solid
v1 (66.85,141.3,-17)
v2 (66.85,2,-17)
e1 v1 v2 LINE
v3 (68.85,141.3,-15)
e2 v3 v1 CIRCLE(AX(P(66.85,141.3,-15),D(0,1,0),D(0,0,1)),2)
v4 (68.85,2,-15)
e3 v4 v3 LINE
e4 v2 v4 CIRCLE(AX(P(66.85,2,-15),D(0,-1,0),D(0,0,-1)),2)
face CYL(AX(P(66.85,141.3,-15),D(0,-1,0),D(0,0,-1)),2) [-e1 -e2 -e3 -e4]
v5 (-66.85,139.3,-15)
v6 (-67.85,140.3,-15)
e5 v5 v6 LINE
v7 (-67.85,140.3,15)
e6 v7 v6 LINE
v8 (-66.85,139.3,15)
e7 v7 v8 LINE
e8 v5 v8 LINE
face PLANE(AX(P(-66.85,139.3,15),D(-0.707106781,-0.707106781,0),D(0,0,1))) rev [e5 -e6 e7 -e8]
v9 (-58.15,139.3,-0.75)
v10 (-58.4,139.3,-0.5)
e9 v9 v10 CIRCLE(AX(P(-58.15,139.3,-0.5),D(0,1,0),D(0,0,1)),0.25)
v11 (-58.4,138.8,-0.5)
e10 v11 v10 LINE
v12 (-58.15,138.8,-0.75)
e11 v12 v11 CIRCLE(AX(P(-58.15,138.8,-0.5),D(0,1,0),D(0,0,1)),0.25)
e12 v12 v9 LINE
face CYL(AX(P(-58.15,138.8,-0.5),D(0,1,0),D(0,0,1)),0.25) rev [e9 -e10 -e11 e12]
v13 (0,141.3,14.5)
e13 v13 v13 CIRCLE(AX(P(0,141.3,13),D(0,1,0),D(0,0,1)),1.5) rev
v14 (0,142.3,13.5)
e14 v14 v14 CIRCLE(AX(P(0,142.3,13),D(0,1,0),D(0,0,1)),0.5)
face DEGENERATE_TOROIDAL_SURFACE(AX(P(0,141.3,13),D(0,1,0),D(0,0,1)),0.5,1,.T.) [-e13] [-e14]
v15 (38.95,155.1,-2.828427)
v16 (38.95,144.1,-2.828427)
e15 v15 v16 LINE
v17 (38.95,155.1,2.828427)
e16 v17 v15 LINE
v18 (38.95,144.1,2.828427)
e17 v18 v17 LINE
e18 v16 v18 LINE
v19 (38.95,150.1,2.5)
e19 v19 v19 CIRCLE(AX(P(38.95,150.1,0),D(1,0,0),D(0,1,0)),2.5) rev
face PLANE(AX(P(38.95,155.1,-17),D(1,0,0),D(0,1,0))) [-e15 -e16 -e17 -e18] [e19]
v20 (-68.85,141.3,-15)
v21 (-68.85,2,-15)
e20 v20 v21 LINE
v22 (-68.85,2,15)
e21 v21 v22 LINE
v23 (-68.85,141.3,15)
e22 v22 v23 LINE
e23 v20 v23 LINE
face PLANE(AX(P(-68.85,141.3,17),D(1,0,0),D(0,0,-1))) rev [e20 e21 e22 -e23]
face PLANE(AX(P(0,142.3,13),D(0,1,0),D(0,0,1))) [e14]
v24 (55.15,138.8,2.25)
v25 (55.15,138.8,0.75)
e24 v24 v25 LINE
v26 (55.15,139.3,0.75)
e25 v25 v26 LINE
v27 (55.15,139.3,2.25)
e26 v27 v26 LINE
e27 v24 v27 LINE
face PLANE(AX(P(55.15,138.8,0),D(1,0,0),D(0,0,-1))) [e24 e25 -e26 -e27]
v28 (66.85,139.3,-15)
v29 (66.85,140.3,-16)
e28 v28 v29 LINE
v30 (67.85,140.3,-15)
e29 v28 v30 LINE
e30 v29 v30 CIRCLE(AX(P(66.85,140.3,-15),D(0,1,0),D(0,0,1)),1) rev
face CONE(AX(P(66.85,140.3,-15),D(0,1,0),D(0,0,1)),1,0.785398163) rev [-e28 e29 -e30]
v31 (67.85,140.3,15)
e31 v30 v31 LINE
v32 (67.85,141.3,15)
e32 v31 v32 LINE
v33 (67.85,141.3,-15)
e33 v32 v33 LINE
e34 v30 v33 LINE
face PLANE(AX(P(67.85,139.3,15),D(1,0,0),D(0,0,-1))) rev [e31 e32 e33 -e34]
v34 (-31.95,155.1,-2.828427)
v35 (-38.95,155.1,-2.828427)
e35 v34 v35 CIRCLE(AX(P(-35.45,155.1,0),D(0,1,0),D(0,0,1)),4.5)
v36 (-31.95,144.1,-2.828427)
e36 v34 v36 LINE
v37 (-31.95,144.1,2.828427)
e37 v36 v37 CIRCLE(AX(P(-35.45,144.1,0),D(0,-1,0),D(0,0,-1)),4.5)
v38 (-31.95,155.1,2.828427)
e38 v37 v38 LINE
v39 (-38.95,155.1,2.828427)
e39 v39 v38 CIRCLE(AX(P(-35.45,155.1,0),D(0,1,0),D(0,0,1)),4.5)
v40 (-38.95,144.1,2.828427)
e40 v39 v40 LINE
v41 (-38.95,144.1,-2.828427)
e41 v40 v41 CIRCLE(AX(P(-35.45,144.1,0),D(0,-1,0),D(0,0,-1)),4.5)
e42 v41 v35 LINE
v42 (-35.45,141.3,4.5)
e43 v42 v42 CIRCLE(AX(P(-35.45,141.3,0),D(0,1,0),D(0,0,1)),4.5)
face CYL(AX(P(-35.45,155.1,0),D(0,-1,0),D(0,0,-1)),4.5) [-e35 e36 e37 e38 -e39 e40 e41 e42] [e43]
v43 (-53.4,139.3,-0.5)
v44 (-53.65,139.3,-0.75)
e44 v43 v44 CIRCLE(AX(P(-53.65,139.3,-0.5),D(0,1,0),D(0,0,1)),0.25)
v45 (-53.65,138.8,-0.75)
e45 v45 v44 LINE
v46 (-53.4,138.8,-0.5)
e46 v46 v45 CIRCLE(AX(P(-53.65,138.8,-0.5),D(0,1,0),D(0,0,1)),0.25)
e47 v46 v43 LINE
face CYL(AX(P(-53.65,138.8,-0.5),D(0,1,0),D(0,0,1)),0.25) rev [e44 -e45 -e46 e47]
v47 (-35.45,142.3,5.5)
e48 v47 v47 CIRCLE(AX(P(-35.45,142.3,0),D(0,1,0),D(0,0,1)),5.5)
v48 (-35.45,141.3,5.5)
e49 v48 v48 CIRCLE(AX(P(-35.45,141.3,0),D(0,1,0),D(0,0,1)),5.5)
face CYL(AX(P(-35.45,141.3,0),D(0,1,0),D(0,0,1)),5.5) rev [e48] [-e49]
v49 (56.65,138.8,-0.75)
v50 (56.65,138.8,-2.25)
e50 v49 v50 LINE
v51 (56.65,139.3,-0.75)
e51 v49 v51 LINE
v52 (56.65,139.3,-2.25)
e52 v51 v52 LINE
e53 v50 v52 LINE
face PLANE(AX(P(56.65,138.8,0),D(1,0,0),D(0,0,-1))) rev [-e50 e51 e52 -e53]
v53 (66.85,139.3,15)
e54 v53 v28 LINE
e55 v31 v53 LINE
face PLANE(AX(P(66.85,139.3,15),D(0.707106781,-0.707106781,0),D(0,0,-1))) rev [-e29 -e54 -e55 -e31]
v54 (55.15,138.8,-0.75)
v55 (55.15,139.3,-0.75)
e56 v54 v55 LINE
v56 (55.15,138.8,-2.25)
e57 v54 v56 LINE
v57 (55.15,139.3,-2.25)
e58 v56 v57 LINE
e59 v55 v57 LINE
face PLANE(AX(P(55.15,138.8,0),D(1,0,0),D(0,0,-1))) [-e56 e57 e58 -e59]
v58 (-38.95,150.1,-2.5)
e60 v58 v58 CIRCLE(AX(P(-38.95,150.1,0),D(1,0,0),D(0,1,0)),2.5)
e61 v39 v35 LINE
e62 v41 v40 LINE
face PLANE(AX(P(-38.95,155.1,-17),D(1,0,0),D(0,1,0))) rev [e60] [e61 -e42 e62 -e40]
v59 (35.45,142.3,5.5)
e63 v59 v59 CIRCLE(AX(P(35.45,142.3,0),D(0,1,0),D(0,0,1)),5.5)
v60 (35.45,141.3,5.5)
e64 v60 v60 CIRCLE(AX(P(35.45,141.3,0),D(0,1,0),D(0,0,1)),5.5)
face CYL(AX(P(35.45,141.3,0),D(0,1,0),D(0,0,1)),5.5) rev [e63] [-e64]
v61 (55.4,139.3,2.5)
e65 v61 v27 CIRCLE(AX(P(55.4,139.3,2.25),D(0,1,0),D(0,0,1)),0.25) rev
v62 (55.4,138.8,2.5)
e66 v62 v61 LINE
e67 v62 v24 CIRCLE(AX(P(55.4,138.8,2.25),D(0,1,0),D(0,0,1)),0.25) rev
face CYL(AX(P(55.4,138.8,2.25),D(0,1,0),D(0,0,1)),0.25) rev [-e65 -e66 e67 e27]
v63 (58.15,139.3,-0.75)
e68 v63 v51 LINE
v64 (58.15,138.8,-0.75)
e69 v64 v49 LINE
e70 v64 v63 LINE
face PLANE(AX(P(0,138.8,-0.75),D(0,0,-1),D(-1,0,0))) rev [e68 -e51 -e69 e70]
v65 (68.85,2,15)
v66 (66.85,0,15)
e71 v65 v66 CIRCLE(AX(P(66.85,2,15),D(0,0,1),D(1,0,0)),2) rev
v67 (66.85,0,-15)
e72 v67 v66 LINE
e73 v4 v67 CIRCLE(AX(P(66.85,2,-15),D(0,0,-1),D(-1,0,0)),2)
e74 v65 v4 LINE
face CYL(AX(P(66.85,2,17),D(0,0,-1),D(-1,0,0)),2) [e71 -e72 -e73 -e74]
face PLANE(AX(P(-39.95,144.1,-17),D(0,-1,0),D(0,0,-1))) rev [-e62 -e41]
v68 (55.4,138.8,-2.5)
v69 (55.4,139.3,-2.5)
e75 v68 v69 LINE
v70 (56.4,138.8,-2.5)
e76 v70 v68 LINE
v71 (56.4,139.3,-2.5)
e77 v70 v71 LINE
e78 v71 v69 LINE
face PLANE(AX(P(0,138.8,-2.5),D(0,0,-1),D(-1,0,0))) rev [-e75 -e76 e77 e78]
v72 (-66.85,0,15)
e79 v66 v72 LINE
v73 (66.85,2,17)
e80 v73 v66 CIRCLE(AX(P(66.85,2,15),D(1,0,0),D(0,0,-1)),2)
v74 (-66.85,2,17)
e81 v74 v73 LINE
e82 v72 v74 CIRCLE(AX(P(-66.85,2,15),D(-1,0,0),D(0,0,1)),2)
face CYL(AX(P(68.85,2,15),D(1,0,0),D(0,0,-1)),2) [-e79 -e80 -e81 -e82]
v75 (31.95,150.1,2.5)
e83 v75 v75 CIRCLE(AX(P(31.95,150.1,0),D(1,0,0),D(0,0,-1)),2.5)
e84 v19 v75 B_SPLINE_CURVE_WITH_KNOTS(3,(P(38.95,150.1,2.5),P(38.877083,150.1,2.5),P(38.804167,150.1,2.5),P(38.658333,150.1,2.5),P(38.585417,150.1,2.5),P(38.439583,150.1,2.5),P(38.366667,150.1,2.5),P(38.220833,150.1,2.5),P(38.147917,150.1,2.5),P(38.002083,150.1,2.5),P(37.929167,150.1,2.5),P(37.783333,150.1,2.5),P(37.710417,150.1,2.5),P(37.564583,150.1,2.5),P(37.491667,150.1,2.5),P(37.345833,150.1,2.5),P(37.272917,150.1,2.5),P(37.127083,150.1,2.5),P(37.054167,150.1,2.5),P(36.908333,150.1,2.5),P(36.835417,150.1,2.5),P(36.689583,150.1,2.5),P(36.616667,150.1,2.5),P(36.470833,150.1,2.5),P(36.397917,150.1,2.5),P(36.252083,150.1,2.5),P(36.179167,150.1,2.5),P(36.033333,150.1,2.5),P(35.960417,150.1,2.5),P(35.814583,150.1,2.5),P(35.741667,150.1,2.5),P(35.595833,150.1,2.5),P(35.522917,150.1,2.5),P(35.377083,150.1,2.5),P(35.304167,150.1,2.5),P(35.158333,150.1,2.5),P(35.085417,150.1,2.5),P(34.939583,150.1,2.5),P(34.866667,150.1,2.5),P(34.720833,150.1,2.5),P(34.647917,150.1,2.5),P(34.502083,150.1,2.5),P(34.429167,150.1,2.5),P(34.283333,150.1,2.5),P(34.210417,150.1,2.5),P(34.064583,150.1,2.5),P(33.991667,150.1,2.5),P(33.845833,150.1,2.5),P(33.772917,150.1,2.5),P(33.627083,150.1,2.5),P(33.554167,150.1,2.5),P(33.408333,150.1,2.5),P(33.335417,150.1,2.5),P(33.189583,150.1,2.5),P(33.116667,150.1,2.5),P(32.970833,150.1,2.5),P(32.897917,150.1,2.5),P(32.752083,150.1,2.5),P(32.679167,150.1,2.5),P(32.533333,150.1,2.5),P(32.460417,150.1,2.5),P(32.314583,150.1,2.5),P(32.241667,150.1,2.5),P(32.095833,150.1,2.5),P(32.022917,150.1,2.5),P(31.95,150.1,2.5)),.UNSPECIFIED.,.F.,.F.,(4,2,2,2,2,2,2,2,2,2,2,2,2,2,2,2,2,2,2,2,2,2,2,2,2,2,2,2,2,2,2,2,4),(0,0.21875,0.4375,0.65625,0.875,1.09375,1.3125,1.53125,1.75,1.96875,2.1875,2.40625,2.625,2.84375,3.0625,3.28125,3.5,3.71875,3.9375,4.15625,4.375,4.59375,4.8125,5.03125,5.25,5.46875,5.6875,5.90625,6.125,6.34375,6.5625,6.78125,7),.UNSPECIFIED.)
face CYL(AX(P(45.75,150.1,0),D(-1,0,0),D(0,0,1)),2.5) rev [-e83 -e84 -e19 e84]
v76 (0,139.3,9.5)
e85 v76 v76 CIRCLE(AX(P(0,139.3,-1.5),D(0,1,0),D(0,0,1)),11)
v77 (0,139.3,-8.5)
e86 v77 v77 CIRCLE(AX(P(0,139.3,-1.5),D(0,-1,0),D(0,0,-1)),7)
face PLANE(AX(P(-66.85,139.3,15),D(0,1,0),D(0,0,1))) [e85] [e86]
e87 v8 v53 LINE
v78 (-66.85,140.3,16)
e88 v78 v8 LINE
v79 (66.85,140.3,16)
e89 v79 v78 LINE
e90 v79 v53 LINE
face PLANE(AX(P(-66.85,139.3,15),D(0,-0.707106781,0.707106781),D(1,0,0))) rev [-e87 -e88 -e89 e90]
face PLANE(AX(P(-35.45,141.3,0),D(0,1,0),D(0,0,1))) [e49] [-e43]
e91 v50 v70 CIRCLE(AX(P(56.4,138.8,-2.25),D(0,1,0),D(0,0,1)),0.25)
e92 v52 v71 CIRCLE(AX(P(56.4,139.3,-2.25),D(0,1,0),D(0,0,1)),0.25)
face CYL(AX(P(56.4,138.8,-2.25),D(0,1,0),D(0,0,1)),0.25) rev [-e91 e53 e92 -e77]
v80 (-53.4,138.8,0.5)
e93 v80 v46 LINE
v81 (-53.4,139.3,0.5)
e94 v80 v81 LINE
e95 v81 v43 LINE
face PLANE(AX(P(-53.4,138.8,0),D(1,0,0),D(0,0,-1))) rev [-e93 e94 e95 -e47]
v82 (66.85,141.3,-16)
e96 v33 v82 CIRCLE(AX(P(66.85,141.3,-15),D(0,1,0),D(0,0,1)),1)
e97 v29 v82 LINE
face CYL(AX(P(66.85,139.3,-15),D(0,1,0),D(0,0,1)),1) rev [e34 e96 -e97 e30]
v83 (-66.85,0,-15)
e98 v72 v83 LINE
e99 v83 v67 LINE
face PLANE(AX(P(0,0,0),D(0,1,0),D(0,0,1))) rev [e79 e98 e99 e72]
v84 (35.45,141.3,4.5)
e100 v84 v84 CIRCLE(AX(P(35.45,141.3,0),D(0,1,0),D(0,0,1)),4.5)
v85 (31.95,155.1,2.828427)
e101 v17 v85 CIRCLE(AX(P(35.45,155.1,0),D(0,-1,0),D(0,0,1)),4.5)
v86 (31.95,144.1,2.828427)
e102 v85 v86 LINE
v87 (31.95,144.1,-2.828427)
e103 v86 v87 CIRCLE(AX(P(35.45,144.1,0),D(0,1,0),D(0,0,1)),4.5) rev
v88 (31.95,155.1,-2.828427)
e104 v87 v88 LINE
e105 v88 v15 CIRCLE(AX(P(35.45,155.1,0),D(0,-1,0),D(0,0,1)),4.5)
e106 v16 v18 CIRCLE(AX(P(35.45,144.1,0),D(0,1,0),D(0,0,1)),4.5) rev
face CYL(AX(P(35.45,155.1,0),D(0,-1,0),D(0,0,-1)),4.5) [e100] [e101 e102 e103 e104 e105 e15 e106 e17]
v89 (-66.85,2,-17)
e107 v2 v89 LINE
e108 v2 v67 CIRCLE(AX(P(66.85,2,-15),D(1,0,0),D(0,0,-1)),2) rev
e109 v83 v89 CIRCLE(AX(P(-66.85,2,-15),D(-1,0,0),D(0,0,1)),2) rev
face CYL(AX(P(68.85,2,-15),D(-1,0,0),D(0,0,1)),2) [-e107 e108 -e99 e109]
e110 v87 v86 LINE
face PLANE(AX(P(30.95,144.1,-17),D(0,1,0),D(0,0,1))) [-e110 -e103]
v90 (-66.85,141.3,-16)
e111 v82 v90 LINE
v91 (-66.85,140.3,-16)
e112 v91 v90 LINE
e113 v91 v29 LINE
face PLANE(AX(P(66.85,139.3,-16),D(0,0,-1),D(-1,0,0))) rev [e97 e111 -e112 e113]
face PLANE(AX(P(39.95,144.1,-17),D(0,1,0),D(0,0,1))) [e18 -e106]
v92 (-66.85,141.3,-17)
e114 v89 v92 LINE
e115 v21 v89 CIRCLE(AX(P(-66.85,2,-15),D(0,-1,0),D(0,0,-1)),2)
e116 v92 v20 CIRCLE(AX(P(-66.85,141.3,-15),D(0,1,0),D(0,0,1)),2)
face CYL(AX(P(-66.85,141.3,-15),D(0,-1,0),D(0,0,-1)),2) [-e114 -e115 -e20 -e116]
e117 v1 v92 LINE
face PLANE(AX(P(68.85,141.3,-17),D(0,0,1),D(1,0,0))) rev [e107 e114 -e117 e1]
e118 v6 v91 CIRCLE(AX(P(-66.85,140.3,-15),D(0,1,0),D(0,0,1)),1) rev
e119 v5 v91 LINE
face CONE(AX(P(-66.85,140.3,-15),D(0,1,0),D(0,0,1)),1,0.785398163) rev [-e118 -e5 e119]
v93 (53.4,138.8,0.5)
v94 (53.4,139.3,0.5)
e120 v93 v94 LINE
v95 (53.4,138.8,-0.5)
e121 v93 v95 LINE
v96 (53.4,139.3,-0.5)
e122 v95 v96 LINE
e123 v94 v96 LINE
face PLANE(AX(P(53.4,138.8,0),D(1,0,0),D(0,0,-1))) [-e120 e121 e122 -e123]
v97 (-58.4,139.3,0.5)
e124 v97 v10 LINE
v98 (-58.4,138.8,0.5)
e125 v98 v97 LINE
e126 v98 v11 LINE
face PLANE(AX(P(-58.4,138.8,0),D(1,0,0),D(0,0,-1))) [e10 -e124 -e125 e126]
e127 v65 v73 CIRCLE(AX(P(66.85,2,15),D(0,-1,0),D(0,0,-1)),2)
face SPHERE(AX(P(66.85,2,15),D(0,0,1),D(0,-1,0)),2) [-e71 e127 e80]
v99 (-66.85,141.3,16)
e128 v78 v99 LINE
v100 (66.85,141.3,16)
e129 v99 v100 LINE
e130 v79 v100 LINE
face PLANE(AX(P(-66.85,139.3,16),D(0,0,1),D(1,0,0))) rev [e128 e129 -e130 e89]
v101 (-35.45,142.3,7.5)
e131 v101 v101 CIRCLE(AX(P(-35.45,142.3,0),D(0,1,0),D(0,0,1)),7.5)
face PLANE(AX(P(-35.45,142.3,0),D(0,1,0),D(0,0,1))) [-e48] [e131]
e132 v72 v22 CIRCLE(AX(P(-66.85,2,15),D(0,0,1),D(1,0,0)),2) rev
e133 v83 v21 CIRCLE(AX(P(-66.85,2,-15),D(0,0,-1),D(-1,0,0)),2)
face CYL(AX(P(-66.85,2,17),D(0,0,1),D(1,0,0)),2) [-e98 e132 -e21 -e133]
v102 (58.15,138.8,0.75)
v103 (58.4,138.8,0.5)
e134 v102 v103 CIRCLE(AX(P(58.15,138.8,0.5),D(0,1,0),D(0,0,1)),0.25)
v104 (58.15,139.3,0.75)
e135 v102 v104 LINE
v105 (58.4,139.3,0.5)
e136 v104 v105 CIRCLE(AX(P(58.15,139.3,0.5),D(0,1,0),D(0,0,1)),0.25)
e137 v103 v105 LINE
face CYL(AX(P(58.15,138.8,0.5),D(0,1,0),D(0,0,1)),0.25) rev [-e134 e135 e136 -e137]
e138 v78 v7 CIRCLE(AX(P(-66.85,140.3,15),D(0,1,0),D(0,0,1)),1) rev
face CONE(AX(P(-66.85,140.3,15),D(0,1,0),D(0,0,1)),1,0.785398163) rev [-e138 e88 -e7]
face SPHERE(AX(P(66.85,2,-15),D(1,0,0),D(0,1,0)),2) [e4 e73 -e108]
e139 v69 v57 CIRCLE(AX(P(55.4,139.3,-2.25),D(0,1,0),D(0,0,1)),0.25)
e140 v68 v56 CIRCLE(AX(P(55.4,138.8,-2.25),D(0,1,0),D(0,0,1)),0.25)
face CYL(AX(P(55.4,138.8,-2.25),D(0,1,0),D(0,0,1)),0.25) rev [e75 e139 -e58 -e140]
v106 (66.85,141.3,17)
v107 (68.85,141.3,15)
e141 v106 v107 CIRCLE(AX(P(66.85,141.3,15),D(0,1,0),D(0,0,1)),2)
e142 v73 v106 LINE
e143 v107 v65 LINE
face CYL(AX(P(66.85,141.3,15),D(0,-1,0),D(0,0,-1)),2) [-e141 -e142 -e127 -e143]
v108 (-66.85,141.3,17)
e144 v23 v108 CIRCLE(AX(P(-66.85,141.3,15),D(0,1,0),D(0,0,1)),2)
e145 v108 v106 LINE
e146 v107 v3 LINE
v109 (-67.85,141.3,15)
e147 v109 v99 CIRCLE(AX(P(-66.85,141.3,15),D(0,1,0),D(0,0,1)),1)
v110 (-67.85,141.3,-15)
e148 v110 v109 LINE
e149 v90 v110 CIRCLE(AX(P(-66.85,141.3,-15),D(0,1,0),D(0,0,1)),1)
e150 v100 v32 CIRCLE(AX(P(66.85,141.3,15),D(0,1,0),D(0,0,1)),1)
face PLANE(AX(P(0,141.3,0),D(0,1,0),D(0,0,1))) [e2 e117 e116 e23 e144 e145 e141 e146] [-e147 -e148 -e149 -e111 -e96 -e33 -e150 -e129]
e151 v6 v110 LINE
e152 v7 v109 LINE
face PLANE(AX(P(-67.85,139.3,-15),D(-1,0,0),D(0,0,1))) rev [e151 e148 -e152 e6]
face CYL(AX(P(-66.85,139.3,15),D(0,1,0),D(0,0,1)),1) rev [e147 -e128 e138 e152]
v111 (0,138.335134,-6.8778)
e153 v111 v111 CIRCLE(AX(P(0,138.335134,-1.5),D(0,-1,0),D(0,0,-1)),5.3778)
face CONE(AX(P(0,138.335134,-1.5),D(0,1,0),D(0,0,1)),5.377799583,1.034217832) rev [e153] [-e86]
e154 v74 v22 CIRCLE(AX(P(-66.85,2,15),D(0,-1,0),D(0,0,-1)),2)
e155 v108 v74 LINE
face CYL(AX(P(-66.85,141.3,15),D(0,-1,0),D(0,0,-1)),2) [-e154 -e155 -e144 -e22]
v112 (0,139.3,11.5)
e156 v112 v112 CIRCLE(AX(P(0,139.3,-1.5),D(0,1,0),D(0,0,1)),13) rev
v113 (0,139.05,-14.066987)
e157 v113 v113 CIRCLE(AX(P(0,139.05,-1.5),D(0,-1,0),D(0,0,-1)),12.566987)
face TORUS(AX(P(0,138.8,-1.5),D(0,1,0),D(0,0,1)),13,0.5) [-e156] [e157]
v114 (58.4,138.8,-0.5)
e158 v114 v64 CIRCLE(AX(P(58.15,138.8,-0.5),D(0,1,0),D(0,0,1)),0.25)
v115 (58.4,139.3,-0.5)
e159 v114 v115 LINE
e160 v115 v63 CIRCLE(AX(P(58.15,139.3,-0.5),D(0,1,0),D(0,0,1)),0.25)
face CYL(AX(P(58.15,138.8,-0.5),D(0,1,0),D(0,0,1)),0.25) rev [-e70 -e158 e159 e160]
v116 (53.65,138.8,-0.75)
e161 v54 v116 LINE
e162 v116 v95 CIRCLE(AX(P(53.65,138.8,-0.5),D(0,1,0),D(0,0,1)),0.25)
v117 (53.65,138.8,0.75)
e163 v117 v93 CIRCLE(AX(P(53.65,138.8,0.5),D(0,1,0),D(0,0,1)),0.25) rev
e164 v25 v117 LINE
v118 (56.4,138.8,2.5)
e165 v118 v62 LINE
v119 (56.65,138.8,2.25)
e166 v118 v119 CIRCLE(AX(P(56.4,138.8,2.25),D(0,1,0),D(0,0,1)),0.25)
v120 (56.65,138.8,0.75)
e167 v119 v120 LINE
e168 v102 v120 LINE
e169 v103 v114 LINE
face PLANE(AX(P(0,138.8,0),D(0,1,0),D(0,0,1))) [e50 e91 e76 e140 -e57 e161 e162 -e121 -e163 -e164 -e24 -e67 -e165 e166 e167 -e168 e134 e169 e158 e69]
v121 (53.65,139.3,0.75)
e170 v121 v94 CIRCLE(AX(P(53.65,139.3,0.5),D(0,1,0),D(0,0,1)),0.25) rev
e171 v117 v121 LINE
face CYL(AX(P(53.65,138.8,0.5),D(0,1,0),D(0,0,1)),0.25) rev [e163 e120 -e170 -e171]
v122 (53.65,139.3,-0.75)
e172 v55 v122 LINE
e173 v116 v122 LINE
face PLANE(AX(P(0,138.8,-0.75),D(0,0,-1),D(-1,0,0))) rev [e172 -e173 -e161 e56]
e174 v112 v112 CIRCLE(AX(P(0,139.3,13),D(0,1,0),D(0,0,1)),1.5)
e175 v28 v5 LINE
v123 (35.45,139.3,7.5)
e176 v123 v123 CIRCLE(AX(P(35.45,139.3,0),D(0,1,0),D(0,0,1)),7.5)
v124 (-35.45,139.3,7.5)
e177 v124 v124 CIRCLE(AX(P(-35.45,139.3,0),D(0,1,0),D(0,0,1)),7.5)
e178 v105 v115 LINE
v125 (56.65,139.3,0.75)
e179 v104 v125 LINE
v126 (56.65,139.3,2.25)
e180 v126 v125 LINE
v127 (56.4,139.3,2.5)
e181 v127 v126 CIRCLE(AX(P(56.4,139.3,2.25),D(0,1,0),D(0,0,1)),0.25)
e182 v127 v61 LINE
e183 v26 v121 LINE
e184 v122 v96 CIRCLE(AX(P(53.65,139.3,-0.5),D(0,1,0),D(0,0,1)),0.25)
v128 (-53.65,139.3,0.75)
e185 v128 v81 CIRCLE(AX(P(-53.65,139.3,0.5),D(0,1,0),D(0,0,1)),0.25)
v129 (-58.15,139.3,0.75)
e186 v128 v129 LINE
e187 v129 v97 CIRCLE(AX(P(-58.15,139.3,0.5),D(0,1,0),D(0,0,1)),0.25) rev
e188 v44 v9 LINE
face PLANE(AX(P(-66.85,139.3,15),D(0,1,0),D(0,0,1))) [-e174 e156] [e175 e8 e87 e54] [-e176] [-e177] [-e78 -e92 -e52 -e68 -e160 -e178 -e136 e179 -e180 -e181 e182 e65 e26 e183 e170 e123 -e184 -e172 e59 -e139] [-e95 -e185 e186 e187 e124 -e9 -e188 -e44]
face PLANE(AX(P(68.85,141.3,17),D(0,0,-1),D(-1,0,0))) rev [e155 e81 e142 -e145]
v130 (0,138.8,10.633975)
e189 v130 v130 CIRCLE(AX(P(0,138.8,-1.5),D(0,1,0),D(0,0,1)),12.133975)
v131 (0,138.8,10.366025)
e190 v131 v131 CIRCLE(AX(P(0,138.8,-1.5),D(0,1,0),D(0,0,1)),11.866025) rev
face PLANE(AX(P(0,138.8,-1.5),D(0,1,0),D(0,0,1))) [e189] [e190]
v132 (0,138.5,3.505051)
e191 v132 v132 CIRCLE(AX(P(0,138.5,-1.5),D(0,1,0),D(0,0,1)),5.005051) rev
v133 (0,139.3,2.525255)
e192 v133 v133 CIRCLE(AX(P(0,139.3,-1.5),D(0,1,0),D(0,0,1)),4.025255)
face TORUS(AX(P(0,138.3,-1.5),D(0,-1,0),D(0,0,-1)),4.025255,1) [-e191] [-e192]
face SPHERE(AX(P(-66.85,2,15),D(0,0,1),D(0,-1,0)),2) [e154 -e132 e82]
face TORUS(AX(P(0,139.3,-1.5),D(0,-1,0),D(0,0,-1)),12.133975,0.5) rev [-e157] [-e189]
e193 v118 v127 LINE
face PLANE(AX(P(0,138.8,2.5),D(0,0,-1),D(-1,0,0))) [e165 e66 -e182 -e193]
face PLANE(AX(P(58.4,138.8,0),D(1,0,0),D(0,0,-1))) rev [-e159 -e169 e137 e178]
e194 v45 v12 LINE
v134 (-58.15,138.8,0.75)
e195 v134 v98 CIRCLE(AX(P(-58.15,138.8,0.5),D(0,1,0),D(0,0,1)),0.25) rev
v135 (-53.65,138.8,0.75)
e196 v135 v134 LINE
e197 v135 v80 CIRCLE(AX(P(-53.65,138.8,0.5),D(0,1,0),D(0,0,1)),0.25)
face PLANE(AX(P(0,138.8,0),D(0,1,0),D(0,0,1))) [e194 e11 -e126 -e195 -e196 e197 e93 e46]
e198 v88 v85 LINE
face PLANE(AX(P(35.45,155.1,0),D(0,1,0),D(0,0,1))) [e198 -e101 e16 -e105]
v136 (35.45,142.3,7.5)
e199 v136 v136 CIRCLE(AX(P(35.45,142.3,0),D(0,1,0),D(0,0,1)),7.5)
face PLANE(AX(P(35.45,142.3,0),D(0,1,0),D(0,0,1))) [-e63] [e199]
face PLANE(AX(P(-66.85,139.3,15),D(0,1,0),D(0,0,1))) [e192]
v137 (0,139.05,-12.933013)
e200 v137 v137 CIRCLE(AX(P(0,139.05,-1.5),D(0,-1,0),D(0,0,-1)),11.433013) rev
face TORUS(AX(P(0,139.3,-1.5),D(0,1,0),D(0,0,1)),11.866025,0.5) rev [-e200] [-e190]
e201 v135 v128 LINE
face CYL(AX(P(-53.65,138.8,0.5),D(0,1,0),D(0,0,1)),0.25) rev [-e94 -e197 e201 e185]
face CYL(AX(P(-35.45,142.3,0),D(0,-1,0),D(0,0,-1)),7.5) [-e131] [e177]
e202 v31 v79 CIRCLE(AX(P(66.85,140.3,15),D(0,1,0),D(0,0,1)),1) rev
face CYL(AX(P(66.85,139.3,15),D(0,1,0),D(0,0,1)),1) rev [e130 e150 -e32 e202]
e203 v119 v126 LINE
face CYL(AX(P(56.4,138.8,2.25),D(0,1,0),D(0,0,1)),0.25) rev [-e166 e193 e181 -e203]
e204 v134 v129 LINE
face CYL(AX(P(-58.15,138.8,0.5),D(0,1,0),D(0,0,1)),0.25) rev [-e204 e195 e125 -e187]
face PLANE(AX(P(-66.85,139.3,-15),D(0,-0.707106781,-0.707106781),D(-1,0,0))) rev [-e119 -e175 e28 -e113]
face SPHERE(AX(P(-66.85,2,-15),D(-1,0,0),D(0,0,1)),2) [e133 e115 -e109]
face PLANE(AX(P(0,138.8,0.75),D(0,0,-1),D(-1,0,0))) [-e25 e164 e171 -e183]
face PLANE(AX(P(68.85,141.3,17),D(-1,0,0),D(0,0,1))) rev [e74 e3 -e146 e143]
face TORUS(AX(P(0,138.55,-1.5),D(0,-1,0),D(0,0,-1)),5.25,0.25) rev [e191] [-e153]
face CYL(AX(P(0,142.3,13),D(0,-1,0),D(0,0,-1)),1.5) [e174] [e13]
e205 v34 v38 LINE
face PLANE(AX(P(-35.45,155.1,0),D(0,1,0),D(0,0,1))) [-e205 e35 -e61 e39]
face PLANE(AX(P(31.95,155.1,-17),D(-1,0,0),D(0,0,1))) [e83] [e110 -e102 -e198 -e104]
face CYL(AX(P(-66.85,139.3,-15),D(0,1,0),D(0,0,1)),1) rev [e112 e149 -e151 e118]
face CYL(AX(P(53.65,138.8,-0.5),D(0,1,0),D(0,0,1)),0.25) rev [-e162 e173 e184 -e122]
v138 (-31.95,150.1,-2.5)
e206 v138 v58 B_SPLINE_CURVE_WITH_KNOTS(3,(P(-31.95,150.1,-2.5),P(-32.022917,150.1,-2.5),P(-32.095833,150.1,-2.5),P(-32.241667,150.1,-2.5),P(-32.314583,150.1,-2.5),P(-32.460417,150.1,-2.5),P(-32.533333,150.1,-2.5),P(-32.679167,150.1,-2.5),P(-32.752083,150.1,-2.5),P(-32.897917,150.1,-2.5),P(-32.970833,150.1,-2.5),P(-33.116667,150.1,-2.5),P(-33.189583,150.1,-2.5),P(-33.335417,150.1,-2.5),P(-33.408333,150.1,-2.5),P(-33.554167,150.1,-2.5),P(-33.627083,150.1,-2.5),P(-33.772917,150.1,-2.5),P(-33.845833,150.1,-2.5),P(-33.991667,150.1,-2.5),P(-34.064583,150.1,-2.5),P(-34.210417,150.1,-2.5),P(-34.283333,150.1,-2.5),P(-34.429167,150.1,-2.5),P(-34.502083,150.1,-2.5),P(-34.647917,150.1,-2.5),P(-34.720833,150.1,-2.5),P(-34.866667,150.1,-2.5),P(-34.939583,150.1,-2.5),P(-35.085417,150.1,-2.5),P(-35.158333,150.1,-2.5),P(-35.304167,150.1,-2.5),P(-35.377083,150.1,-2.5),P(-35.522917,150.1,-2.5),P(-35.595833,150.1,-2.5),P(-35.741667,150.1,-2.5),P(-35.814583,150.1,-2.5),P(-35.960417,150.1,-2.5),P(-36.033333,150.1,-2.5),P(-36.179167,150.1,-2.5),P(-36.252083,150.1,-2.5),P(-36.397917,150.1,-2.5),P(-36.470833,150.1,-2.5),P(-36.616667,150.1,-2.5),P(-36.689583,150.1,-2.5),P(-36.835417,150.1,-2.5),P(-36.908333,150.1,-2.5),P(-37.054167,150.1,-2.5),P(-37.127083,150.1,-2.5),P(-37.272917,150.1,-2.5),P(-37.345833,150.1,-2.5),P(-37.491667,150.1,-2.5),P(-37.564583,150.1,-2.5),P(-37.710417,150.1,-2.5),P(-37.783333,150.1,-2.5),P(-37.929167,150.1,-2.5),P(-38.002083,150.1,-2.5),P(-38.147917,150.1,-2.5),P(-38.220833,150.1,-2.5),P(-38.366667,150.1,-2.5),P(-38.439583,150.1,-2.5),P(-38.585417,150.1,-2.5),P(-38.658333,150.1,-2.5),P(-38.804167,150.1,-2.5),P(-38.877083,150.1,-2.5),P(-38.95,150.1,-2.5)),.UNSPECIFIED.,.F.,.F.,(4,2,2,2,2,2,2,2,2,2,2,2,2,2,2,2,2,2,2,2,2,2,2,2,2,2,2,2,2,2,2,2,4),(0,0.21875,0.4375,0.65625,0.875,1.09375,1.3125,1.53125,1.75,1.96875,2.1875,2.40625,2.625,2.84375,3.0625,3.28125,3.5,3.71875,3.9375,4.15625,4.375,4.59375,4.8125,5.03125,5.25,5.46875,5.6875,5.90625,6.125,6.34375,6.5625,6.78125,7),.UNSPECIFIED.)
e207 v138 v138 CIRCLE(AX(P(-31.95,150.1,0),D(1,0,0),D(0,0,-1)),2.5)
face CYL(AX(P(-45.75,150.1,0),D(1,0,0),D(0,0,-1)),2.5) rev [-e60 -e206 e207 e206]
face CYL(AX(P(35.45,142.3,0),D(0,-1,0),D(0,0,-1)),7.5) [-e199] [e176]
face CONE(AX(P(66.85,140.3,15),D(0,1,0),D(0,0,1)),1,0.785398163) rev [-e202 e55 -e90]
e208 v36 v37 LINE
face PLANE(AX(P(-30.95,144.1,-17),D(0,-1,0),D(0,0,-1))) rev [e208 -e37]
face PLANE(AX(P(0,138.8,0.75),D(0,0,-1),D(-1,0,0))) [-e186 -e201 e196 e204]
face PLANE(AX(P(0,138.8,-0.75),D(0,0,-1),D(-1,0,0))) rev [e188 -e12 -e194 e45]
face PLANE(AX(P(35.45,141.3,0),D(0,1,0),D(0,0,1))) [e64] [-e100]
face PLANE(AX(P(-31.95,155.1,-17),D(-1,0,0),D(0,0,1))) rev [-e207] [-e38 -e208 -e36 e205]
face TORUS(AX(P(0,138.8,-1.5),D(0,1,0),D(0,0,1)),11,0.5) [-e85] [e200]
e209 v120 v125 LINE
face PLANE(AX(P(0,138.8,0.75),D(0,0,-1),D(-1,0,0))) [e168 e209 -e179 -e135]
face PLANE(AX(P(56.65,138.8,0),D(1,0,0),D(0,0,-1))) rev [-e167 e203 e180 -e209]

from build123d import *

# Parameters (mm, degrees)
SKETCH1_W           = 137.7
SKETCH1_H           = 34
BOSS_EXTRUDE1_DEPTH = 141.3
FILLET1_R           = 2
CUT_EXTRUDE1_DEPTH  = 2
CHAMFER1_SIZE       = 1
SKETCH3_R           = 7.5
BOSS_EXTRUDE2_DEPTH = 3
SKETCH4_R           = 5.5
CUT_EXTRUDE2_DEPTH  = 1
SKETCH5_R           = 4.5
BOSS_EXTRUDE3_DEPTH = 13.8
SKETCH6_W           = 1
SKETCH6_H           = 11
CUT_EXTRUDE3_DEPTH  = 171.54422447
SKETCH7_R           = 2.5
CUT_EXTRUDE4_DEPTH  = 13.8
SKETCH8_W           = 1.5
SKETCH8_H           = 1.5
CUT_EXTRUDE5_DEPTH  = 0.5
SKETCH9_R           = 12.5
SKETCH9_R_2         = 11.5
CUT_EXTRUDE6_DEPTH  = 0.5
SKETCH10_R          = 1.5
BOSS_EXTRUDE4_DEPTH = 3
FILLET2_R           = 1
SKETCH12_W          = 2
SKETCH12_H          = 0.813567547
FILLET3_R           = 1
FILLET4_R           = 0.5
FILLET5_R           = 0.5


with BuildPart() as part:
    # Sketch1 → Boss-Extrude1 (new body)
    with BuildSketch(Plane(origin=(0, 0, 0), x_dir=(1, 0, 0), z_dir=(0, 1, 0))):
        Rectangle(SKETCH1_W, SKETCH1_H)
    extrude(amount=BOSS_EXTRUDE1_DEPTH)

    # Fillet1
    fillet1_edges = [part.edges().sort_by_distance(p)[0] for p in [
        (0, 0, -17),
        (68.85, 0, 0),
        (0, 0, 17),
        (-68.85, 0, 0),
        (-68.85, 70.65, -17),
        (68.85, 70.65, -17),
        (68.85, 70.65, 17),
        (-68.85, 70.65, 17),
    ]]
    fillet(fillet1_edges, radius=FILLET1_R)

    # Sketch2 → Cut-Extrude1 (cut)
    with BuildSketch(Plane(origin=(0, 141.3, 0), x_dir=(1, 0, 0), z_dir=(0, 1, 0))):
        with BuildLine():
            Line((-66.85, -16), (66.85, -16))
            ThreePointArc((66.85, -16), (67.557106781, -15.707106781), (67.85, -15))
            Line((67.85, -15), (67.85, 15))
            ThreePointArc((67.85, 15), (67.557106781, 15.707106781), (66.85, 16))
            Line((66.85, 16), (-66.85, 16))
            ThreePointArc((-66.85, 16), (-67.557106781, 15.707106781), (-67.85, 15))
            Line((-67.85, 15), (-67.85, -15))
            ThreePointArc((-67.85, -15), (-67.557106781, -15.707106781), (-66.85, -16))
        make_face()
    extrude(amount=-CUT_EXTRUDE1_DEPTH, mode=Mode.SUBTRACT)

    # Chamfer1
    chamfer1_edges = [part.edges().sort_by_distance(p)[0] for p in [
        (-67.557106781, 139.3, 15.707106781),
        (-67.85, 139.3, 0),
        (-67.557106781, 139.3, -15.707106781),
        (0, 139.3, -16),
        (67.557106781, 139.3, -15.707106781),
        (67.85, 139.3, 0),
        (67.557106781, 139.3, 15.707106781),
        (0, 139.3, 16),
    ]]
    chamfer(chamfer1_edges, length=CHAMFER1_SIZE - 0.0001)  # a hair under: the kernel refuses the full size

    # Sketch3 → Boss-Extrude2 (add)
    with BuildSketch(Plane(origin=(0, 139.3, 0), x_dir=(1, 0, 0), z_dir=(0, 1, 0))):
        with Locations(Location((-35.45, 0, 0), (0, 0, 270))):
            Circle(SKETCH3_R)
        with Locations(Location((35.45, 0, 0), (0, 0, 270))):
            Circle(SKETCH3_R)
    extrude(amount=BOSS_EXTRUDE2_DEPTH)

    # Sketch4 → Cut-Extrude2 (cut)
    with BuildSketch(Plane(origin=(0, 142.3, 0), x_dir=(1, 0, 0), z_dir=(0, 1, 0))):
        with Locations(Location((-35.45, 0, 0), (0, 0, 270))):
            Circle(SKETCH4_R)
        with Locations(Location((35.45, 0, 0), (0, 0, 270))):
            Circle(SKETCH4_R)
    extrude(amount=-CUT_EXTRUDE2_DEPTH, mode=Mode.SUBTRACT)

    # Sketch5 → Boss-Extrude3 (add)
    with BuildSketch(Plane(origin=(0, 141.3, 0), x_dir=(1, 0, 0), z_dir=(0, 1, 0))):
        with Locations(Location((-35.45, 0, 0), (0, 0, 90))):
            Circle(SKETCH5_R)
    boss_extrude3 = extrude(amount=BOSS_EXTRUDE3_DEPTH)

    # Sketch6 → Cut-Extrude3 (cut, symmetric)
    with BuildSketch(Plane.XY):
        with Locations((-31.45, 149.6)):
            Rectangle(SKETCH6_W, SKETCH6_H)
        with Locations((-39.45, 149.6)):
            Rectangle(SKETCH6_W, SKETCH6_H)
    cut_extrude3 = extrude(amount=CUT_EXTRUDE3_DEPTH, both=True, mode=Mode.SUBTRACT)

    # Sketch7 → Cut-Extrude4 (cut)
    with BuildSketch(Plane(origin=(-31.95, 0, 0), x_dir=(0, 0, -1), z_dir=(1, 0, 0))):
        with Locations((0, 150.1)):
            Circle(SKETCH7_R)
    cut_extrude4 = extrude(amount=-CUT_EXTRUDE4_DEPTH, mode=Mode.SUBTRACT)

    # Mirror1: Boss-Extrude3, Cut-Extrude3, Cut-Extrude4 across plane
    add(boss_extrude3.mirror(Plane(origin=(0, 0, 0), x_dir=(0, 0, 1), z_dir=(1, 0, 0))))
    add(cut_extrude3.mirror(Plane(origin=(0, 0, 0), x_dir=(0, 0, 1), z_dir=(1, 0, 0))), mode=Mode.SUBTRACT)
    add(cut_extrude4.mirror(Plane(origin=(0, 0, 0), x_dir=(0, 0, 1), z_dir=(1, 0, 0))), mode=Mode.SUBTRACT)

    # Sketch8 → Cut-Extrude5 (cut)
    with BuildSketch(Plane(origin=(0, 139.3, 0), x_dir=(1, 0, 0), z_dir=(0, 1, 0))):
        with BuildLine():
            Line((55.15, 0.75), (56.65, 0.75))
            Line((56.65, 0.75), (56.65, 2.25))
            ThreePointArc((56.65, 2.25), (56.576776695, 2.426776695), (56.4, 2.5))
            Line((56.4, 2.5), (55.4, 2.5))
            ThreePointArc((55.4, 2.5), (55.223223305, 2.426776695), (55.15, 2.25))
            Line((55.15, 2.25), (55.15, 0.75))
        make_face()
        with Locations((55.9, 0)):
            Rectangle(SKETCH8_W, SKETCH8_H)
        with BuildLine():
            Line((53.65, -0.75), (55.15, -0.75))
            Line((55.15, -0.75), (55.15, 0.75))
            Line((55.15, 0.75), (53.65, 0.75))
            ThreePointArc((53.65, 0.75), (53.473223305, 0.676776695), (53.4, 0.5))
            Line((53.4, 0.5), (53.4, -0.5))
            ThreePointArc((53.4, -0.5), (53.473223305, -0.676776695), (53.65, -0.75))
        make_face()
        with BuildLine():
            Line((56.65, -0.75), (58.15, -0.75))
            ThreePointArc((58.15, -0.75), (58.326776695, -0.676776695), (58.4, -0.5))
            Line((58.4, -0.5), (58.4, 0.5))
            ThreePointArc((58.4, 0.5), (58.326776695, 0.676776695), (58.15, 0.75))
            Line((58.15, 0.75), (56.65, 0.75))
            Line((56.65, 0.75), (56.65, -0.75))
        make_face()
        with BuildLine():
            Line((56.65, -2.25), (56.65, -0.75))
            Line((56.65, -0.75), (55.15, -0.75))
            Line((55.15, -0.75), (55.15, -2.25))
            ThreePointArc((55.15, -2.25), (55.223223305, -2.426776695), (55.4, -2.5))
            Line((55.4, -2.5), (56.4, -2.5))
            ThreePointArc((56.4, -2.5), (56.576776695, -2.426776695), (56.65, -2.25))
        make_face()
        with BuildLine():
            Line((-53.65, 0.75), (-58.15, 0.75))
            ThreePointArc((-58.15, 0.75), (-58.326776695, 0.676776695), (-58.4, 0.5))
            Line((-58.4, 0.5), (-58.4, -0.5))
            ThreePointArc((-58.4, -0.5), (-58.326776695, -0.676776695), (-58.15, -0.75))
            Line((-58.15, -0.75), (-53.65, -0.75))
            ThreePointArc((-53.65, -0.75), (-53.473223305, -0.676776695), (-53.4, -0.5))
            Line((-53.4, -0.5), (-53.4, 0.5))
            ThreePointArc((-53.4, 0.5), (-53.473223305, 0.676776695), (-53.65, 0.75))
        make_face()
    extrude(amount=-CUT_EXTRUDE5_DEPTH, mode=Mode.SUBTRACT)

    # Sketch9 → Cut-Extrude6 (cut)
    with BuildSketch(Plane(origin=(0, 139.3, 0), x_dir=(1, 0, 0), z_dir=(0, 1, 0))):
        with Locations(Location((0, 1.5, 0), (0, 0, 270))):
            Circle(SKETCH9_R)
        with Locations(Location((0, 1.5, 0), (0, 0, 270))):
            Circle(SKETCH9_R_2, mode=Mode.SUBTRACT)
    extrude(amount=-CUT_EXTRUDE6_DEPTH, mode=Mode.SUBTRACT)

    # Sketch10 → Boss-Extrude4 (add)
    with BuildSketch(Plane(origin=(0, 139.3, 0), x_dir=(1, 0, 0), z_dir=(0, 1, 0))):
        with Locations(Location((0, -13, 0), (0, 0, 270))):
            Circle(SKETCH10_R)
    extrude(amount=BOSS_EXTRUDE4_DEPTH)

    # Fillet2
    fillet2_edges = [part.edges().sort_by_distance(p)[0] for p in [
        (0, 142.3, 11.5),
    ]]
    fillet(fillet2_edges, radius=FILLET2_R)

    # Sketch12 → Cut-Revolve1 (revolve, cut)
    with BuildSketch(Plane.XY.offset(-1.5), mode=Mode.PRIVATE) as cut_revolve1_sk:
        with BuildLine():
            ThreePointArc((-5, 138.55), (-5.126407718, 138.332686982), (-5.377799583, 138.335134306))
            Line((-5.377799583, 138.335134306), (-7, 139.3))
            Line((-7, 139.3), (-5, 139.3))
            Line((-5, 139.3), (-5, 138.55))
        make_face()
        with Locations((-6, 139.706783774)):
            Rectangle(SKETCH12_W, SKETCH12_H)
    revolve(cut_revolve1_sk.sketch.rotate(Axis((0, 0, -1.5), (0, 1, 0)), 270), axis=Axis((0, 0, -1.5), (0, 1, 0)), mode=Mode.SUBTRACT)

    # Fillet3
    fillet3_edges = [part.edges().sort_by_distance(p)[0] for p in [
        (0, 139.3, 3.5),
    ]]
    fillet(fillet3_edges, radius=FILLET3_R)

    # Fillet4
    fillet4_edges = [part.edges().sort_by_distance(p)[0] for p in [
        (0, 139.3, -14),
        (0, 139.3, -13),
    ]]
    fillet(fillet4_edges, radius=FILLET4_R - 0.0001)  # a hair under: the kernel refuses the full size

    # Fillet5
    fillet5_edges = [part.edges().sort_by_distance(p)[0] for p in [
        (0, 138.8, -14),
        (0, 138.8, -13),
    ]]
    fillet(fillet5_edges, radius=FILLET5_R)


solid = part.part
